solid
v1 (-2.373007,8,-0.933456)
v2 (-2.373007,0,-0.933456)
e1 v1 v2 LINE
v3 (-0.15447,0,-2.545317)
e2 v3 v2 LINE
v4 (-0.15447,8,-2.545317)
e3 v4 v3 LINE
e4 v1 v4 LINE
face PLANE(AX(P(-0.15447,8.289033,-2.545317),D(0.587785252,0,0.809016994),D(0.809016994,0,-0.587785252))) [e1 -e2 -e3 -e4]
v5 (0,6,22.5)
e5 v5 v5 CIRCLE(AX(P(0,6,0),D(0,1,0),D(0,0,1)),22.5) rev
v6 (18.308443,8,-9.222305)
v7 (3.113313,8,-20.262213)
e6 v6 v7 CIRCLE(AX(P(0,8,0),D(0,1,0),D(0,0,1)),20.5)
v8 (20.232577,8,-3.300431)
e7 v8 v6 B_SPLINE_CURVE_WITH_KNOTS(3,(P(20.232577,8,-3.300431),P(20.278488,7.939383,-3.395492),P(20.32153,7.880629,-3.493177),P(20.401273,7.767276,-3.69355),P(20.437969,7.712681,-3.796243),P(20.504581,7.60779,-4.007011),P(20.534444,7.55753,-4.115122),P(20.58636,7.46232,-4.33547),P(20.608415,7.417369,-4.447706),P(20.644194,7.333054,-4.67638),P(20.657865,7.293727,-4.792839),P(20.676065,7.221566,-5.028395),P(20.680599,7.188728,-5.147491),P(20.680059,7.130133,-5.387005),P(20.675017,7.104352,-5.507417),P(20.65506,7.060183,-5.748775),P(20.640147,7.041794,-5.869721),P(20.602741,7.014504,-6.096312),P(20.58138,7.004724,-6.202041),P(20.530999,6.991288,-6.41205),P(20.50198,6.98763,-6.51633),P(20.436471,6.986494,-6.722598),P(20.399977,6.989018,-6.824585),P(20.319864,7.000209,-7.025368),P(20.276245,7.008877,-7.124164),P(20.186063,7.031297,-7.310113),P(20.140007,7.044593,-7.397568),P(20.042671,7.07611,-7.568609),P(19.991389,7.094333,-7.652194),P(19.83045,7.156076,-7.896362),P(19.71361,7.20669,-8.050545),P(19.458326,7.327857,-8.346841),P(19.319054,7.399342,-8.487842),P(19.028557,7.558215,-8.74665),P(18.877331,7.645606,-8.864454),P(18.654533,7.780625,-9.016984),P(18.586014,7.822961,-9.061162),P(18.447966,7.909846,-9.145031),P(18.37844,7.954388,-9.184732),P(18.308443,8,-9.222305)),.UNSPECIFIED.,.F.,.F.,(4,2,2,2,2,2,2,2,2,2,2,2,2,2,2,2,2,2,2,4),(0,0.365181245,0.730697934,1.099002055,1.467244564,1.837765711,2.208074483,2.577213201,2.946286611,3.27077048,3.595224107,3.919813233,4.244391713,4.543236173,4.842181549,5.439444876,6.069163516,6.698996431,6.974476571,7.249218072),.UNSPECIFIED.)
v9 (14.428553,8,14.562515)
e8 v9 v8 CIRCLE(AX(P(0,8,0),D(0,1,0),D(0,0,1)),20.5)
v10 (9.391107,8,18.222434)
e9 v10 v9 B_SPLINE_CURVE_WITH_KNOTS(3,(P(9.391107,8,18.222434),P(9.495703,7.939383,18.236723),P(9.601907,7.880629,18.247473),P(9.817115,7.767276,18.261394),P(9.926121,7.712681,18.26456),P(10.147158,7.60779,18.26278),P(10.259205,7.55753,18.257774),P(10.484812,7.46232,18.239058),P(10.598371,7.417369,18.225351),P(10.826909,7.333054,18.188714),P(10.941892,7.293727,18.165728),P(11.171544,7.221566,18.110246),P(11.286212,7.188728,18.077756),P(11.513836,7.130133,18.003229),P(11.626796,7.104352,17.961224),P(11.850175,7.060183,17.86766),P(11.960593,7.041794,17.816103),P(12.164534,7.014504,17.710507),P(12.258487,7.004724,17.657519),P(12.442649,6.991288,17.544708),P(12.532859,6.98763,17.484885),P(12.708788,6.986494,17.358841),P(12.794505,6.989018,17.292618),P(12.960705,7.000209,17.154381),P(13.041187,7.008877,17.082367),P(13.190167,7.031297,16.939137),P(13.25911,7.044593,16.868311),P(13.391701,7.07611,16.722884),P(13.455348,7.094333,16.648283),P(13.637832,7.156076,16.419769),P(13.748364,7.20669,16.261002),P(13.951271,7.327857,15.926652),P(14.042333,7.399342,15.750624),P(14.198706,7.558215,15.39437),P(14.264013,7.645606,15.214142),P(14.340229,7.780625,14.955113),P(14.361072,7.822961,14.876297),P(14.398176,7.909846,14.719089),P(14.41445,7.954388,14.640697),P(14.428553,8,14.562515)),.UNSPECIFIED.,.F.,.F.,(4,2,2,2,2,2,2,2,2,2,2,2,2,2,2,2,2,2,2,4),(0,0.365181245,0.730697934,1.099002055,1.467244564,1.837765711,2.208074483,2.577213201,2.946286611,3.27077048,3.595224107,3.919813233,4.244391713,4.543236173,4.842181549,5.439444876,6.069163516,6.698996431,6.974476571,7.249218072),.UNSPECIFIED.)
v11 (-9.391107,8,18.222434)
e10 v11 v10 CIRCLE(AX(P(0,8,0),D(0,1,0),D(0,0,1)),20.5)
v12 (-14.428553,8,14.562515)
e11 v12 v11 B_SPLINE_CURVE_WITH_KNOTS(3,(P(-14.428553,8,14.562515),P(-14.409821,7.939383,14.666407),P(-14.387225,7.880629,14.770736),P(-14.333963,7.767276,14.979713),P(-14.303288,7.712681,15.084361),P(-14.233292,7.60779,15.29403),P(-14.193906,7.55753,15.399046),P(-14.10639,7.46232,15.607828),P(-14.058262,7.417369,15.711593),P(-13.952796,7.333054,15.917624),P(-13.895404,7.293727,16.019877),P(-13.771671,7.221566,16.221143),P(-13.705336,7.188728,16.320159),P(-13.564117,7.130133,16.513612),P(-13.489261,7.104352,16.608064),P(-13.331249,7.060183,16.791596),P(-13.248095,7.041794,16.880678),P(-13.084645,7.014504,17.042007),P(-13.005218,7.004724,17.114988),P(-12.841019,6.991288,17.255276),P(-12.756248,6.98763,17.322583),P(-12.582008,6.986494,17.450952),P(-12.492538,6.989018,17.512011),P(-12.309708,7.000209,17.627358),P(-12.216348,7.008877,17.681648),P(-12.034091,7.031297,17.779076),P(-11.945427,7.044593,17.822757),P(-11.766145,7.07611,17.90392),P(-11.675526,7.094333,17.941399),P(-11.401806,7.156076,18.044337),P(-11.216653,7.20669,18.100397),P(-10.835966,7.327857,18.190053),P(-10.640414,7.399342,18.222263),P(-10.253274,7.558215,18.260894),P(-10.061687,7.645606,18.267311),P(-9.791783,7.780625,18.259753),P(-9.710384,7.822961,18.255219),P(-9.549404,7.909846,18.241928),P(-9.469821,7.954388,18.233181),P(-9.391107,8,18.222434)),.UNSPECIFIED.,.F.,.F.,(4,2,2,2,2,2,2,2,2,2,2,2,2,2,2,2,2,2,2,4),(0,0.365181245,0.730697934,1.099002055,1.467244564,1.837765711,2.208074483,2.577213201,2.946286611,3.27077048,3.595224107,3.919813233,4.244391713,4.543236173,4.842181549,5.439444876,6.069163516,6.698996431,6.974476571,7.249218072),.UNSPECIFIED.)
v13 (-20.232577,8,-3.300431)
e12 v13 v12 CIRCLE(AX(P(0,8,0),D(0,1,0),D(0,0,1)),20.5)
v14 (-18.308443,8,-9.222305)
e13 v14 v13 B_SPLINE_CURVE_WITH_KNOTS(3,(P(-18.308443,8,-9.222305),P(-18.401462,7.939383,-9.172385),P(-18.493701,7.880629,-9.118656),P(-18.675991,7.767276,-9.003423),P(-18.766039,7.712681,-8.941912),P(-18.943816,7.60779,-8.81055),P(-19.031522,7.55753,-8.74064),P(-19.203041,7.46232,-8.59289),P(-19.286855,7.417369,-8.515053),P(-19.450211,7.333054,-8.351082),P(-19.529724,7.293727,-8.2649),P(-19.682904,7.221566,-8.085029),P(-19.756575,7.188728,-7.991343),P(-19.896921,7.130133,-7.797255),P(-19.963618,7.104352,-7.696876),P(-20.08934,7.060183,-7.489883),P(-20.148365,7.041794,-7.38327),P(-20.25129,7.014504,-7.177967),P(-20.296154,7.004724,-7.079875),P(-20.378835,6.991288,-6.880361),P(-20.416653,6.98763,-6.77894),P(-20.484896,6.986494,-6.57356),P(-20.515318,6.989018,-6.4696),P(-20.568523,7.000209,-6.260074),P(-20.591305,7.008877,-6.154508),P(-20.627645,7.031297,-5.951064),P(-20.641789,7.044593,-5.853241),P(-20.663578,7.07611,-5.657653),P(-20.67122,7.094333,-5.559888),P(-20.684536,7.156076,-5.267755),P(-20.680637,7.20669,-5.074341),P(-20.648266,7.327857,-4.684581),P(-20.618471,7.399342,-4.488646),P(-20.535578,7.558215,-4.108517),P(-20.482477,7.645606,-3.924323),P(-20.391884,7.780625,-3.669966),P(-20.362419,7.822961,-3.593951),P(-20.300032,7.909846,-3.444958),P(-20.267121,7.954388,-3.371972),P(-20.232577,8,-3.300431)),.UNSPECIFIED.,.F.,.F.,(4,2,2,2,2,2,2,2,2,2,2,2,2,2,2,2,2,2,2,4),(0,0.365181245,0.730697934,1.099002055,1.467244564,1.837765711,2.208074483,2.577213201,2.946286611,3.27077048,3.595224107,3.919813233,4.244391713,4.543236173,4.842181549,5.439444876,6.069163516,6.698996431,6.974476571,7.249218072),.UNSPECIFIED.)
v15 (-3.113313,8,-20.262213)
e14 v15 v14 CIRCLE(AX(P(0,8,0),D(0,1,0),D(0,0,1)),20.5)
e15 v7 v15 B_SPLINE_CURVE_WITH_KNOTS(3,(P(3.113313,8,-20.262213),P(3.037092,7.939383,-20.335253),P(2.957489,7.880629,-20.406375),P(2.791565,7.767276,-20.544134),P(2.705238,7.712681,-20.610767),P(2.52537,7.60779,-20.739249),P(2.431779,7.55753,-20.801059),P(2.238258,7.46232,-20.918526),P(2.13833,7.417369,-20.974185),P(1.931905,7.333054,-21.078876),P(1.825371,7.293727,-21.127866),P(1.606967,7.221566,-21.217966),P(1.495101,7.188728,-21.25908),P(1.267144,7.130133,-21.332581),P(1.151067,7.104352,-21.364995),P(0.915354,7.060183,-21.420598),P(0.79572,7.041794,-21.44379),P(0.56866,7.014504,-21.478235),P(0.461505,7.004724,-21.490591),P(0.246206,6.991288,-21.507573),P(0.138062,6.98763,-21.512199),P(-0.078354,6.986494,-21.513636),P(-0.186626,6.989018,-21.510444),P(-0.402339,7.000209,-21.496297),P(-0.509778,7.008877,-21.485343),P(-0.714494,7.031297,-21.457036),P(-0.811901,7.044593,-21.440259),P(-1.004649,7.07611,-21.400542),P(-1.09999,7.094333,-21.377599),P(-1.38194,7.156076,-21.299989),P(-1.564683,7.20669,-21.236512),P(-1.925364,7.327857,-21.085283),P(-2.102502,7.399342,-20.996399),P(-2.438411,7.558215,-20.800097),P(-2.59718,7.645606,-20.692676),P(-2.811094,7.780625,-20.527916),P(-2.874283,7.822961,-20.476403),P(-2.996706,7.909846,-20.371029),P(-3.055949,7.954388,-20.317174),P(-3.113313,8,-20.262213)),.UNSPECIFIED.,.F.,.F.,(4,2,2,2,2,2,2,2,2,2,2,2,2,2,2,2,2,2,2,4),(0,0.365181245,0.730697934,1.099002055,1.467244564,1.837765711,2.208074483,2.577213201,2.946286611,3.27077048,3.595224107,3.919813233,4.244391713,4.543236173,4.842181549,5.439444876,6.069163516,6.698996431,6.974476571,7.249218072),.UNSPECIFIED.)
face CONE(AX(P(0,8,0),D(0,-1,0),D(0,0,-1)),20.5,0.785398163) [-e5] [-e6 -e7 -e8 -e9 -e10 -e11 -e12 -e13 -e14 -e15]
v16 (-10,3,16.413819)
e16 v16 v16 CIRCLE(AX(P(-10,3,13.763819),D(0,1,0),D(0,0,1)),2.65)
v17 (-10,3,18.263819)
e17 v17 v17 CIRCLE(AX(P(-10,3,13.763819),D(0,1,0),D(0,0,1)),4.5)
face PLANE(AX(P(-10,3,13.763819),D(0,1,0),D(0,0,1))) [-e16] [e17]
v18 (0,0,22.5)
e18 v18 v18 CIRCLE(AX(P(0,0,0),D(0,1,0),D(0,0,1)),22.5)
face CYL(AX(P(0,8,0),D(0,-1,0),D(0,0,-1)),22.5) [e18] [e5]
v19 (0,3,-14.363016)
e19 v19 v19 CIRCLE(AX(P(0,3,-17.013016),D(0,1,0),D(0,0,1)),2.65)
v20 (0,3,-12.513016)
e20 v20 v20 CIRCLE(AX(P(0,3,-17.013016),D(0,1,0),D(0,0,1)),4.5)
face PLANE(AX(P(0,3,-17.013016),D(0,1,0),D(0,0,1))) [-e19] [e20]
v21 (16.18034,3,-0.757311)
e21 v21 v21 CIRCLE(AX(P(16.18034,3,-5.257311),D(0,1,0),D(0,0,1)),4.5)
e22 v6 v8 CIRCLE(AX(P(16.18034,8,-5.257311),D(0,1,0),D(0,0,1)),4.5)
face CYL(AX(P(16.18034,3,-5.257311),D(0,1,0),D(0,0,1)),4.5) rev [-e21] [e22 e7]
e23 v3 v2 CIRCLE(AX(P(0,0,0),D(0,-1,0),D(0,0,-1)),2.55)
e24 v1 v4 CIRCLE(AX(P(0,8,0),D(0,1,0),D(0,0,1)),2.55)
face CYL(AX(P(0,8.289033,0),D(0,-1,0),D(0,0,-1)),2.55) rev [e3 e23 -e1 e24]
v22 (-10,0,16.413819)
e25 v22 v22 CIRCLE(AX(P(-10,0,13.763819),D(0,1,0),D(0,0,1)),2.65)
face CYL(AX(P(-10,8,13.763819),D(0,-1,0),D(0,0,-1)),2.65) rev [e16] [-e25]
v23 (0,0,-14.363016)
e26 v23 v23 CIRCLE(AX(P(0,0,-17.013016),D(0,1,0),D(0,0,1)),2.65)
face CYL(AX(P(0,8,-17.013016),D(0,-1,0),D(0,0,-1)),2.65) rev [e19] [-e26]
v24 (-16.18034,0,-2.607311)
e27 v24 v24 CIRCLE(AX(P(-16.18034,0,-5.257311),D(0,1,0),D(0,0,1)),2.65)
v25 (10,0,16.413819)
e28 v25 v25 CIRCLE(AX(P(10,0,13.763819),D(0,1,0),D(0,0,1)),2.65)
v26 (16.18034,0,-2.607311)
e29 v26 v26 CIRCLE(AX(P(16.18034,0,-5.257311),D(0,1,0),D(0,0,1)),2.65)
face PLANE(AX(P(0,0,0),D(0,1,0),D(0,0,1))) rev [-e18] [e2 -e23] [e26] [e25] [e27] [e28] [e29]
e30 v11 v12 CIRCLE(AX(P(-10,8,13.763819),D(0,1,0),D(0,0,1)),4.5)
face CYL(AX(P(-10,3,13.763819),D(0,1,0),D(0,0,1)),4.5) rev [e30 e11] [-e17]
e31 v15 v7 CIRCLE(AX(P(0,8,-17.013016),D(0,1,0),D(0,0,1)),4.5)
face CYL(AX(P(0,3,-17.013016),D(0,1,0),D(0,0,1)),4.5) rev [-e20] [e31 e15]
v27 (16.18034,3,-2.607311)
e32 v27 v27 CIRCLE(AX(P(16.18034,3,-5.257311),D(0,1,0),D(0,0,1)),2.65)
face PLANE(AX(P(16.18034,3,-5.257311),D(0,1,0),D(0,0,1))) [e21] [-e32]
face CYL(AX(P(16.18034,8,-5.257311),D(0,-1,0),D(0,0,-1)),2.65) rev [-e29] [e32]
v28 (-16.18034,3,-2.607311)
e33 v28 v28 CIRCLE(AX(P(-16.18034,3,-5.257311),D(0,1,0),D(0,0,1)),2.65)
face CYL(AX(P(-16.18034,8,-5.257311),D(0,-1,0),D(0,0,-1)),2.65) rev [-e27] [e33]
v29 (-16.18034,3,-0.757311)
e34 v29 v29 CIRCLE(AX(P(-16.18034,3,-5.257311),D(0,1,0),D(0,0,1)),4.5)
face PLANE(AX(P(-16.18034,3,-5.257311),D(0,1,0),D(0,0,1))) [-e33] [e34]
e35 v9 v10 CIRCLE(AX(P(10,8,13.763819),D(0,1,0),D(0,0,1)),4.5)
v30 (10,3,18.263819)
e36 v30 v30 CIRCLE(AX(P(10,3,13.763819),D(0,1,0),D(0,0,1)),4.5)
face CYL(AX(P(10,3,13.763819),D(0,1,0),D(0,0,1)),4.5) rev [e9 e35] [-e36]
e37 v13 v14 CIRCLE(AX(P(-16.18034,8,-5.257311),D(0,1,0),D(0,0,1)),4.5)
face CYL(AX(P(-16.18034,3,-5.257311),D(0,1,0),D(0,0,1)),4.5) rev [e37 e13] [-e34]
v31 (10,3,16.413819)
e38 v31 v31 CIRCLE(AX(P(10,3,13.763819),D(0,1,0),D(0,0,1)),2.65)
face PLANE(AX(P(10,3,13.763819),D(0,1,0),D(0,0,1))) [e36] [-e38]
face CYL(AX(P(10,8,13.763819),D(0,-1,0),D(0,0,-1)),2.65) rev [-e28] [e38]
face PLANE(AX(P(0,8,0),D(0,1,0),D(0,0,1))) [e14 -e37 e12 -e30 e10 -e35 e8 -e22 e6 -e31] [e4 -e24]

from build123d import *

# Parameters (mm, degrees)
SKETCH1_R           = 22.5
SKETCH1_R_2         = 2.65
BOSS_EXTRUDE1_DEPTH = 8
SKETCH2_R           = 4.5
CUT_EXTRUDE1_DEPTH  = 5
CHAMFER1_SIZE       = 2
CUT_EXTRUDE3_DEPTH  = 33.810059595


with BuildPart() as part:
    # Sketch1 → Boss-Extrude1 (new body)
    with BuildSketch(Plane(origin=(0, 0, 0), x_dir=(1, 0, 0), z_dir=(0, 1, 0))):
        with Locations(Location((0, 0, 0), (0, 0, 270))):
            Circle(SKETCH1_R)
        with Locations(Location((0, 17.013016167, 0), (0, 0, 270))):
            Circle(SKETCH1_R_2, mode=Mode.SUBTRACT)
        with Locations(Location((-16.180339887, 5.257311121, 0), (0, 0, 270))):
            Circle(SKETCH1_R_2, mode=Mode.SUBTRACT)
        with Locations(Location((-10, -13.763819205, 0), (0, 0, 270))):
            Circle(SKETCH1_R_2, mode=Mode.SUBTRACT)
        with Locations(Location((10, -13.763819205, 0), (0, 0, 270))):
            Circle(SKETCH1_R_2, mode=Mode.SUBTRACT)
        with Locations(Location((16.180339887, 5.257311121, 0), (0, 0, 270))):
            Circle(SKETCH1_R_2, mode=Mode.SUBTRACT)
    extrude(amount=BOSS_EXTRUDE1_DEPTH)

    # Sketch2 → Cut-Extrude1 (cut)
    with BuildSketch(Plane(origin=(0, 8, 0), x_dir=(1, 0, 0), z_dir=(0, 1, 0))):
        with Locations(Location((-16.180339887, 5.257311121, 0), (0, 0, 270))):
            Circle(SKETCH2_R)
        with Locations(Location((0, 17.013016167, 0), (0, 0, 270))):
            Circle(SKETCH2_R)
        with Locations(Location((16.180339887, 5.257311121, 0), (0, 0, 270))):
            Circle(SKETCH2_R)
        with Locations(Location((10, -13.763819205, 0), (0, 0, 270))):
            Circle(SKETCH2_R)
        with Locations(Location((-10, -13.763819205, 0), (0, 0, 270))):
            Circle(SKETCH2_R)
    extrude(amount=-CUT_EXTRUDE1_DEPTH, mode=Mode.SUBTRACT)

    # Chamfer1
    # the kernel refuses this chamfer: 2 mm, written as the material it takes off along each edge
    with BuildSketch(Plane(origin=(0, 8, 0), x_dir=(0, 0, 1), z_dir=(-1, 0, 0))) as chamfer1_piece_1:
        Polygon((22.5, -CHAMFER1_SIZE), (22.5 - CHAMFER1_SIZE, 0), (22.5, 0), align=None)
    revolve(axis=Axis((0, 8, 0), (0, 1, 0)), mode=Mode.SUBTRACT)

    # Sketch3 → Cut-Extrude3 (cut, through all)
    with BuildSketch(Plane.XZ):
        with BuildLine():
            Line((-0.154470077, -2.545317072), (-2.373006508, -0.933456004))
            ThreePointArc((-2.373006508, -0.933456004), (1.498852393, 2.062993336), (-0.154470077, -2.545317072))
        make_face()
    extrude(amount=-CUT_EXTRUDE3_DEPTH, mode=Mode.SUBTRACT)


solid = part.part
